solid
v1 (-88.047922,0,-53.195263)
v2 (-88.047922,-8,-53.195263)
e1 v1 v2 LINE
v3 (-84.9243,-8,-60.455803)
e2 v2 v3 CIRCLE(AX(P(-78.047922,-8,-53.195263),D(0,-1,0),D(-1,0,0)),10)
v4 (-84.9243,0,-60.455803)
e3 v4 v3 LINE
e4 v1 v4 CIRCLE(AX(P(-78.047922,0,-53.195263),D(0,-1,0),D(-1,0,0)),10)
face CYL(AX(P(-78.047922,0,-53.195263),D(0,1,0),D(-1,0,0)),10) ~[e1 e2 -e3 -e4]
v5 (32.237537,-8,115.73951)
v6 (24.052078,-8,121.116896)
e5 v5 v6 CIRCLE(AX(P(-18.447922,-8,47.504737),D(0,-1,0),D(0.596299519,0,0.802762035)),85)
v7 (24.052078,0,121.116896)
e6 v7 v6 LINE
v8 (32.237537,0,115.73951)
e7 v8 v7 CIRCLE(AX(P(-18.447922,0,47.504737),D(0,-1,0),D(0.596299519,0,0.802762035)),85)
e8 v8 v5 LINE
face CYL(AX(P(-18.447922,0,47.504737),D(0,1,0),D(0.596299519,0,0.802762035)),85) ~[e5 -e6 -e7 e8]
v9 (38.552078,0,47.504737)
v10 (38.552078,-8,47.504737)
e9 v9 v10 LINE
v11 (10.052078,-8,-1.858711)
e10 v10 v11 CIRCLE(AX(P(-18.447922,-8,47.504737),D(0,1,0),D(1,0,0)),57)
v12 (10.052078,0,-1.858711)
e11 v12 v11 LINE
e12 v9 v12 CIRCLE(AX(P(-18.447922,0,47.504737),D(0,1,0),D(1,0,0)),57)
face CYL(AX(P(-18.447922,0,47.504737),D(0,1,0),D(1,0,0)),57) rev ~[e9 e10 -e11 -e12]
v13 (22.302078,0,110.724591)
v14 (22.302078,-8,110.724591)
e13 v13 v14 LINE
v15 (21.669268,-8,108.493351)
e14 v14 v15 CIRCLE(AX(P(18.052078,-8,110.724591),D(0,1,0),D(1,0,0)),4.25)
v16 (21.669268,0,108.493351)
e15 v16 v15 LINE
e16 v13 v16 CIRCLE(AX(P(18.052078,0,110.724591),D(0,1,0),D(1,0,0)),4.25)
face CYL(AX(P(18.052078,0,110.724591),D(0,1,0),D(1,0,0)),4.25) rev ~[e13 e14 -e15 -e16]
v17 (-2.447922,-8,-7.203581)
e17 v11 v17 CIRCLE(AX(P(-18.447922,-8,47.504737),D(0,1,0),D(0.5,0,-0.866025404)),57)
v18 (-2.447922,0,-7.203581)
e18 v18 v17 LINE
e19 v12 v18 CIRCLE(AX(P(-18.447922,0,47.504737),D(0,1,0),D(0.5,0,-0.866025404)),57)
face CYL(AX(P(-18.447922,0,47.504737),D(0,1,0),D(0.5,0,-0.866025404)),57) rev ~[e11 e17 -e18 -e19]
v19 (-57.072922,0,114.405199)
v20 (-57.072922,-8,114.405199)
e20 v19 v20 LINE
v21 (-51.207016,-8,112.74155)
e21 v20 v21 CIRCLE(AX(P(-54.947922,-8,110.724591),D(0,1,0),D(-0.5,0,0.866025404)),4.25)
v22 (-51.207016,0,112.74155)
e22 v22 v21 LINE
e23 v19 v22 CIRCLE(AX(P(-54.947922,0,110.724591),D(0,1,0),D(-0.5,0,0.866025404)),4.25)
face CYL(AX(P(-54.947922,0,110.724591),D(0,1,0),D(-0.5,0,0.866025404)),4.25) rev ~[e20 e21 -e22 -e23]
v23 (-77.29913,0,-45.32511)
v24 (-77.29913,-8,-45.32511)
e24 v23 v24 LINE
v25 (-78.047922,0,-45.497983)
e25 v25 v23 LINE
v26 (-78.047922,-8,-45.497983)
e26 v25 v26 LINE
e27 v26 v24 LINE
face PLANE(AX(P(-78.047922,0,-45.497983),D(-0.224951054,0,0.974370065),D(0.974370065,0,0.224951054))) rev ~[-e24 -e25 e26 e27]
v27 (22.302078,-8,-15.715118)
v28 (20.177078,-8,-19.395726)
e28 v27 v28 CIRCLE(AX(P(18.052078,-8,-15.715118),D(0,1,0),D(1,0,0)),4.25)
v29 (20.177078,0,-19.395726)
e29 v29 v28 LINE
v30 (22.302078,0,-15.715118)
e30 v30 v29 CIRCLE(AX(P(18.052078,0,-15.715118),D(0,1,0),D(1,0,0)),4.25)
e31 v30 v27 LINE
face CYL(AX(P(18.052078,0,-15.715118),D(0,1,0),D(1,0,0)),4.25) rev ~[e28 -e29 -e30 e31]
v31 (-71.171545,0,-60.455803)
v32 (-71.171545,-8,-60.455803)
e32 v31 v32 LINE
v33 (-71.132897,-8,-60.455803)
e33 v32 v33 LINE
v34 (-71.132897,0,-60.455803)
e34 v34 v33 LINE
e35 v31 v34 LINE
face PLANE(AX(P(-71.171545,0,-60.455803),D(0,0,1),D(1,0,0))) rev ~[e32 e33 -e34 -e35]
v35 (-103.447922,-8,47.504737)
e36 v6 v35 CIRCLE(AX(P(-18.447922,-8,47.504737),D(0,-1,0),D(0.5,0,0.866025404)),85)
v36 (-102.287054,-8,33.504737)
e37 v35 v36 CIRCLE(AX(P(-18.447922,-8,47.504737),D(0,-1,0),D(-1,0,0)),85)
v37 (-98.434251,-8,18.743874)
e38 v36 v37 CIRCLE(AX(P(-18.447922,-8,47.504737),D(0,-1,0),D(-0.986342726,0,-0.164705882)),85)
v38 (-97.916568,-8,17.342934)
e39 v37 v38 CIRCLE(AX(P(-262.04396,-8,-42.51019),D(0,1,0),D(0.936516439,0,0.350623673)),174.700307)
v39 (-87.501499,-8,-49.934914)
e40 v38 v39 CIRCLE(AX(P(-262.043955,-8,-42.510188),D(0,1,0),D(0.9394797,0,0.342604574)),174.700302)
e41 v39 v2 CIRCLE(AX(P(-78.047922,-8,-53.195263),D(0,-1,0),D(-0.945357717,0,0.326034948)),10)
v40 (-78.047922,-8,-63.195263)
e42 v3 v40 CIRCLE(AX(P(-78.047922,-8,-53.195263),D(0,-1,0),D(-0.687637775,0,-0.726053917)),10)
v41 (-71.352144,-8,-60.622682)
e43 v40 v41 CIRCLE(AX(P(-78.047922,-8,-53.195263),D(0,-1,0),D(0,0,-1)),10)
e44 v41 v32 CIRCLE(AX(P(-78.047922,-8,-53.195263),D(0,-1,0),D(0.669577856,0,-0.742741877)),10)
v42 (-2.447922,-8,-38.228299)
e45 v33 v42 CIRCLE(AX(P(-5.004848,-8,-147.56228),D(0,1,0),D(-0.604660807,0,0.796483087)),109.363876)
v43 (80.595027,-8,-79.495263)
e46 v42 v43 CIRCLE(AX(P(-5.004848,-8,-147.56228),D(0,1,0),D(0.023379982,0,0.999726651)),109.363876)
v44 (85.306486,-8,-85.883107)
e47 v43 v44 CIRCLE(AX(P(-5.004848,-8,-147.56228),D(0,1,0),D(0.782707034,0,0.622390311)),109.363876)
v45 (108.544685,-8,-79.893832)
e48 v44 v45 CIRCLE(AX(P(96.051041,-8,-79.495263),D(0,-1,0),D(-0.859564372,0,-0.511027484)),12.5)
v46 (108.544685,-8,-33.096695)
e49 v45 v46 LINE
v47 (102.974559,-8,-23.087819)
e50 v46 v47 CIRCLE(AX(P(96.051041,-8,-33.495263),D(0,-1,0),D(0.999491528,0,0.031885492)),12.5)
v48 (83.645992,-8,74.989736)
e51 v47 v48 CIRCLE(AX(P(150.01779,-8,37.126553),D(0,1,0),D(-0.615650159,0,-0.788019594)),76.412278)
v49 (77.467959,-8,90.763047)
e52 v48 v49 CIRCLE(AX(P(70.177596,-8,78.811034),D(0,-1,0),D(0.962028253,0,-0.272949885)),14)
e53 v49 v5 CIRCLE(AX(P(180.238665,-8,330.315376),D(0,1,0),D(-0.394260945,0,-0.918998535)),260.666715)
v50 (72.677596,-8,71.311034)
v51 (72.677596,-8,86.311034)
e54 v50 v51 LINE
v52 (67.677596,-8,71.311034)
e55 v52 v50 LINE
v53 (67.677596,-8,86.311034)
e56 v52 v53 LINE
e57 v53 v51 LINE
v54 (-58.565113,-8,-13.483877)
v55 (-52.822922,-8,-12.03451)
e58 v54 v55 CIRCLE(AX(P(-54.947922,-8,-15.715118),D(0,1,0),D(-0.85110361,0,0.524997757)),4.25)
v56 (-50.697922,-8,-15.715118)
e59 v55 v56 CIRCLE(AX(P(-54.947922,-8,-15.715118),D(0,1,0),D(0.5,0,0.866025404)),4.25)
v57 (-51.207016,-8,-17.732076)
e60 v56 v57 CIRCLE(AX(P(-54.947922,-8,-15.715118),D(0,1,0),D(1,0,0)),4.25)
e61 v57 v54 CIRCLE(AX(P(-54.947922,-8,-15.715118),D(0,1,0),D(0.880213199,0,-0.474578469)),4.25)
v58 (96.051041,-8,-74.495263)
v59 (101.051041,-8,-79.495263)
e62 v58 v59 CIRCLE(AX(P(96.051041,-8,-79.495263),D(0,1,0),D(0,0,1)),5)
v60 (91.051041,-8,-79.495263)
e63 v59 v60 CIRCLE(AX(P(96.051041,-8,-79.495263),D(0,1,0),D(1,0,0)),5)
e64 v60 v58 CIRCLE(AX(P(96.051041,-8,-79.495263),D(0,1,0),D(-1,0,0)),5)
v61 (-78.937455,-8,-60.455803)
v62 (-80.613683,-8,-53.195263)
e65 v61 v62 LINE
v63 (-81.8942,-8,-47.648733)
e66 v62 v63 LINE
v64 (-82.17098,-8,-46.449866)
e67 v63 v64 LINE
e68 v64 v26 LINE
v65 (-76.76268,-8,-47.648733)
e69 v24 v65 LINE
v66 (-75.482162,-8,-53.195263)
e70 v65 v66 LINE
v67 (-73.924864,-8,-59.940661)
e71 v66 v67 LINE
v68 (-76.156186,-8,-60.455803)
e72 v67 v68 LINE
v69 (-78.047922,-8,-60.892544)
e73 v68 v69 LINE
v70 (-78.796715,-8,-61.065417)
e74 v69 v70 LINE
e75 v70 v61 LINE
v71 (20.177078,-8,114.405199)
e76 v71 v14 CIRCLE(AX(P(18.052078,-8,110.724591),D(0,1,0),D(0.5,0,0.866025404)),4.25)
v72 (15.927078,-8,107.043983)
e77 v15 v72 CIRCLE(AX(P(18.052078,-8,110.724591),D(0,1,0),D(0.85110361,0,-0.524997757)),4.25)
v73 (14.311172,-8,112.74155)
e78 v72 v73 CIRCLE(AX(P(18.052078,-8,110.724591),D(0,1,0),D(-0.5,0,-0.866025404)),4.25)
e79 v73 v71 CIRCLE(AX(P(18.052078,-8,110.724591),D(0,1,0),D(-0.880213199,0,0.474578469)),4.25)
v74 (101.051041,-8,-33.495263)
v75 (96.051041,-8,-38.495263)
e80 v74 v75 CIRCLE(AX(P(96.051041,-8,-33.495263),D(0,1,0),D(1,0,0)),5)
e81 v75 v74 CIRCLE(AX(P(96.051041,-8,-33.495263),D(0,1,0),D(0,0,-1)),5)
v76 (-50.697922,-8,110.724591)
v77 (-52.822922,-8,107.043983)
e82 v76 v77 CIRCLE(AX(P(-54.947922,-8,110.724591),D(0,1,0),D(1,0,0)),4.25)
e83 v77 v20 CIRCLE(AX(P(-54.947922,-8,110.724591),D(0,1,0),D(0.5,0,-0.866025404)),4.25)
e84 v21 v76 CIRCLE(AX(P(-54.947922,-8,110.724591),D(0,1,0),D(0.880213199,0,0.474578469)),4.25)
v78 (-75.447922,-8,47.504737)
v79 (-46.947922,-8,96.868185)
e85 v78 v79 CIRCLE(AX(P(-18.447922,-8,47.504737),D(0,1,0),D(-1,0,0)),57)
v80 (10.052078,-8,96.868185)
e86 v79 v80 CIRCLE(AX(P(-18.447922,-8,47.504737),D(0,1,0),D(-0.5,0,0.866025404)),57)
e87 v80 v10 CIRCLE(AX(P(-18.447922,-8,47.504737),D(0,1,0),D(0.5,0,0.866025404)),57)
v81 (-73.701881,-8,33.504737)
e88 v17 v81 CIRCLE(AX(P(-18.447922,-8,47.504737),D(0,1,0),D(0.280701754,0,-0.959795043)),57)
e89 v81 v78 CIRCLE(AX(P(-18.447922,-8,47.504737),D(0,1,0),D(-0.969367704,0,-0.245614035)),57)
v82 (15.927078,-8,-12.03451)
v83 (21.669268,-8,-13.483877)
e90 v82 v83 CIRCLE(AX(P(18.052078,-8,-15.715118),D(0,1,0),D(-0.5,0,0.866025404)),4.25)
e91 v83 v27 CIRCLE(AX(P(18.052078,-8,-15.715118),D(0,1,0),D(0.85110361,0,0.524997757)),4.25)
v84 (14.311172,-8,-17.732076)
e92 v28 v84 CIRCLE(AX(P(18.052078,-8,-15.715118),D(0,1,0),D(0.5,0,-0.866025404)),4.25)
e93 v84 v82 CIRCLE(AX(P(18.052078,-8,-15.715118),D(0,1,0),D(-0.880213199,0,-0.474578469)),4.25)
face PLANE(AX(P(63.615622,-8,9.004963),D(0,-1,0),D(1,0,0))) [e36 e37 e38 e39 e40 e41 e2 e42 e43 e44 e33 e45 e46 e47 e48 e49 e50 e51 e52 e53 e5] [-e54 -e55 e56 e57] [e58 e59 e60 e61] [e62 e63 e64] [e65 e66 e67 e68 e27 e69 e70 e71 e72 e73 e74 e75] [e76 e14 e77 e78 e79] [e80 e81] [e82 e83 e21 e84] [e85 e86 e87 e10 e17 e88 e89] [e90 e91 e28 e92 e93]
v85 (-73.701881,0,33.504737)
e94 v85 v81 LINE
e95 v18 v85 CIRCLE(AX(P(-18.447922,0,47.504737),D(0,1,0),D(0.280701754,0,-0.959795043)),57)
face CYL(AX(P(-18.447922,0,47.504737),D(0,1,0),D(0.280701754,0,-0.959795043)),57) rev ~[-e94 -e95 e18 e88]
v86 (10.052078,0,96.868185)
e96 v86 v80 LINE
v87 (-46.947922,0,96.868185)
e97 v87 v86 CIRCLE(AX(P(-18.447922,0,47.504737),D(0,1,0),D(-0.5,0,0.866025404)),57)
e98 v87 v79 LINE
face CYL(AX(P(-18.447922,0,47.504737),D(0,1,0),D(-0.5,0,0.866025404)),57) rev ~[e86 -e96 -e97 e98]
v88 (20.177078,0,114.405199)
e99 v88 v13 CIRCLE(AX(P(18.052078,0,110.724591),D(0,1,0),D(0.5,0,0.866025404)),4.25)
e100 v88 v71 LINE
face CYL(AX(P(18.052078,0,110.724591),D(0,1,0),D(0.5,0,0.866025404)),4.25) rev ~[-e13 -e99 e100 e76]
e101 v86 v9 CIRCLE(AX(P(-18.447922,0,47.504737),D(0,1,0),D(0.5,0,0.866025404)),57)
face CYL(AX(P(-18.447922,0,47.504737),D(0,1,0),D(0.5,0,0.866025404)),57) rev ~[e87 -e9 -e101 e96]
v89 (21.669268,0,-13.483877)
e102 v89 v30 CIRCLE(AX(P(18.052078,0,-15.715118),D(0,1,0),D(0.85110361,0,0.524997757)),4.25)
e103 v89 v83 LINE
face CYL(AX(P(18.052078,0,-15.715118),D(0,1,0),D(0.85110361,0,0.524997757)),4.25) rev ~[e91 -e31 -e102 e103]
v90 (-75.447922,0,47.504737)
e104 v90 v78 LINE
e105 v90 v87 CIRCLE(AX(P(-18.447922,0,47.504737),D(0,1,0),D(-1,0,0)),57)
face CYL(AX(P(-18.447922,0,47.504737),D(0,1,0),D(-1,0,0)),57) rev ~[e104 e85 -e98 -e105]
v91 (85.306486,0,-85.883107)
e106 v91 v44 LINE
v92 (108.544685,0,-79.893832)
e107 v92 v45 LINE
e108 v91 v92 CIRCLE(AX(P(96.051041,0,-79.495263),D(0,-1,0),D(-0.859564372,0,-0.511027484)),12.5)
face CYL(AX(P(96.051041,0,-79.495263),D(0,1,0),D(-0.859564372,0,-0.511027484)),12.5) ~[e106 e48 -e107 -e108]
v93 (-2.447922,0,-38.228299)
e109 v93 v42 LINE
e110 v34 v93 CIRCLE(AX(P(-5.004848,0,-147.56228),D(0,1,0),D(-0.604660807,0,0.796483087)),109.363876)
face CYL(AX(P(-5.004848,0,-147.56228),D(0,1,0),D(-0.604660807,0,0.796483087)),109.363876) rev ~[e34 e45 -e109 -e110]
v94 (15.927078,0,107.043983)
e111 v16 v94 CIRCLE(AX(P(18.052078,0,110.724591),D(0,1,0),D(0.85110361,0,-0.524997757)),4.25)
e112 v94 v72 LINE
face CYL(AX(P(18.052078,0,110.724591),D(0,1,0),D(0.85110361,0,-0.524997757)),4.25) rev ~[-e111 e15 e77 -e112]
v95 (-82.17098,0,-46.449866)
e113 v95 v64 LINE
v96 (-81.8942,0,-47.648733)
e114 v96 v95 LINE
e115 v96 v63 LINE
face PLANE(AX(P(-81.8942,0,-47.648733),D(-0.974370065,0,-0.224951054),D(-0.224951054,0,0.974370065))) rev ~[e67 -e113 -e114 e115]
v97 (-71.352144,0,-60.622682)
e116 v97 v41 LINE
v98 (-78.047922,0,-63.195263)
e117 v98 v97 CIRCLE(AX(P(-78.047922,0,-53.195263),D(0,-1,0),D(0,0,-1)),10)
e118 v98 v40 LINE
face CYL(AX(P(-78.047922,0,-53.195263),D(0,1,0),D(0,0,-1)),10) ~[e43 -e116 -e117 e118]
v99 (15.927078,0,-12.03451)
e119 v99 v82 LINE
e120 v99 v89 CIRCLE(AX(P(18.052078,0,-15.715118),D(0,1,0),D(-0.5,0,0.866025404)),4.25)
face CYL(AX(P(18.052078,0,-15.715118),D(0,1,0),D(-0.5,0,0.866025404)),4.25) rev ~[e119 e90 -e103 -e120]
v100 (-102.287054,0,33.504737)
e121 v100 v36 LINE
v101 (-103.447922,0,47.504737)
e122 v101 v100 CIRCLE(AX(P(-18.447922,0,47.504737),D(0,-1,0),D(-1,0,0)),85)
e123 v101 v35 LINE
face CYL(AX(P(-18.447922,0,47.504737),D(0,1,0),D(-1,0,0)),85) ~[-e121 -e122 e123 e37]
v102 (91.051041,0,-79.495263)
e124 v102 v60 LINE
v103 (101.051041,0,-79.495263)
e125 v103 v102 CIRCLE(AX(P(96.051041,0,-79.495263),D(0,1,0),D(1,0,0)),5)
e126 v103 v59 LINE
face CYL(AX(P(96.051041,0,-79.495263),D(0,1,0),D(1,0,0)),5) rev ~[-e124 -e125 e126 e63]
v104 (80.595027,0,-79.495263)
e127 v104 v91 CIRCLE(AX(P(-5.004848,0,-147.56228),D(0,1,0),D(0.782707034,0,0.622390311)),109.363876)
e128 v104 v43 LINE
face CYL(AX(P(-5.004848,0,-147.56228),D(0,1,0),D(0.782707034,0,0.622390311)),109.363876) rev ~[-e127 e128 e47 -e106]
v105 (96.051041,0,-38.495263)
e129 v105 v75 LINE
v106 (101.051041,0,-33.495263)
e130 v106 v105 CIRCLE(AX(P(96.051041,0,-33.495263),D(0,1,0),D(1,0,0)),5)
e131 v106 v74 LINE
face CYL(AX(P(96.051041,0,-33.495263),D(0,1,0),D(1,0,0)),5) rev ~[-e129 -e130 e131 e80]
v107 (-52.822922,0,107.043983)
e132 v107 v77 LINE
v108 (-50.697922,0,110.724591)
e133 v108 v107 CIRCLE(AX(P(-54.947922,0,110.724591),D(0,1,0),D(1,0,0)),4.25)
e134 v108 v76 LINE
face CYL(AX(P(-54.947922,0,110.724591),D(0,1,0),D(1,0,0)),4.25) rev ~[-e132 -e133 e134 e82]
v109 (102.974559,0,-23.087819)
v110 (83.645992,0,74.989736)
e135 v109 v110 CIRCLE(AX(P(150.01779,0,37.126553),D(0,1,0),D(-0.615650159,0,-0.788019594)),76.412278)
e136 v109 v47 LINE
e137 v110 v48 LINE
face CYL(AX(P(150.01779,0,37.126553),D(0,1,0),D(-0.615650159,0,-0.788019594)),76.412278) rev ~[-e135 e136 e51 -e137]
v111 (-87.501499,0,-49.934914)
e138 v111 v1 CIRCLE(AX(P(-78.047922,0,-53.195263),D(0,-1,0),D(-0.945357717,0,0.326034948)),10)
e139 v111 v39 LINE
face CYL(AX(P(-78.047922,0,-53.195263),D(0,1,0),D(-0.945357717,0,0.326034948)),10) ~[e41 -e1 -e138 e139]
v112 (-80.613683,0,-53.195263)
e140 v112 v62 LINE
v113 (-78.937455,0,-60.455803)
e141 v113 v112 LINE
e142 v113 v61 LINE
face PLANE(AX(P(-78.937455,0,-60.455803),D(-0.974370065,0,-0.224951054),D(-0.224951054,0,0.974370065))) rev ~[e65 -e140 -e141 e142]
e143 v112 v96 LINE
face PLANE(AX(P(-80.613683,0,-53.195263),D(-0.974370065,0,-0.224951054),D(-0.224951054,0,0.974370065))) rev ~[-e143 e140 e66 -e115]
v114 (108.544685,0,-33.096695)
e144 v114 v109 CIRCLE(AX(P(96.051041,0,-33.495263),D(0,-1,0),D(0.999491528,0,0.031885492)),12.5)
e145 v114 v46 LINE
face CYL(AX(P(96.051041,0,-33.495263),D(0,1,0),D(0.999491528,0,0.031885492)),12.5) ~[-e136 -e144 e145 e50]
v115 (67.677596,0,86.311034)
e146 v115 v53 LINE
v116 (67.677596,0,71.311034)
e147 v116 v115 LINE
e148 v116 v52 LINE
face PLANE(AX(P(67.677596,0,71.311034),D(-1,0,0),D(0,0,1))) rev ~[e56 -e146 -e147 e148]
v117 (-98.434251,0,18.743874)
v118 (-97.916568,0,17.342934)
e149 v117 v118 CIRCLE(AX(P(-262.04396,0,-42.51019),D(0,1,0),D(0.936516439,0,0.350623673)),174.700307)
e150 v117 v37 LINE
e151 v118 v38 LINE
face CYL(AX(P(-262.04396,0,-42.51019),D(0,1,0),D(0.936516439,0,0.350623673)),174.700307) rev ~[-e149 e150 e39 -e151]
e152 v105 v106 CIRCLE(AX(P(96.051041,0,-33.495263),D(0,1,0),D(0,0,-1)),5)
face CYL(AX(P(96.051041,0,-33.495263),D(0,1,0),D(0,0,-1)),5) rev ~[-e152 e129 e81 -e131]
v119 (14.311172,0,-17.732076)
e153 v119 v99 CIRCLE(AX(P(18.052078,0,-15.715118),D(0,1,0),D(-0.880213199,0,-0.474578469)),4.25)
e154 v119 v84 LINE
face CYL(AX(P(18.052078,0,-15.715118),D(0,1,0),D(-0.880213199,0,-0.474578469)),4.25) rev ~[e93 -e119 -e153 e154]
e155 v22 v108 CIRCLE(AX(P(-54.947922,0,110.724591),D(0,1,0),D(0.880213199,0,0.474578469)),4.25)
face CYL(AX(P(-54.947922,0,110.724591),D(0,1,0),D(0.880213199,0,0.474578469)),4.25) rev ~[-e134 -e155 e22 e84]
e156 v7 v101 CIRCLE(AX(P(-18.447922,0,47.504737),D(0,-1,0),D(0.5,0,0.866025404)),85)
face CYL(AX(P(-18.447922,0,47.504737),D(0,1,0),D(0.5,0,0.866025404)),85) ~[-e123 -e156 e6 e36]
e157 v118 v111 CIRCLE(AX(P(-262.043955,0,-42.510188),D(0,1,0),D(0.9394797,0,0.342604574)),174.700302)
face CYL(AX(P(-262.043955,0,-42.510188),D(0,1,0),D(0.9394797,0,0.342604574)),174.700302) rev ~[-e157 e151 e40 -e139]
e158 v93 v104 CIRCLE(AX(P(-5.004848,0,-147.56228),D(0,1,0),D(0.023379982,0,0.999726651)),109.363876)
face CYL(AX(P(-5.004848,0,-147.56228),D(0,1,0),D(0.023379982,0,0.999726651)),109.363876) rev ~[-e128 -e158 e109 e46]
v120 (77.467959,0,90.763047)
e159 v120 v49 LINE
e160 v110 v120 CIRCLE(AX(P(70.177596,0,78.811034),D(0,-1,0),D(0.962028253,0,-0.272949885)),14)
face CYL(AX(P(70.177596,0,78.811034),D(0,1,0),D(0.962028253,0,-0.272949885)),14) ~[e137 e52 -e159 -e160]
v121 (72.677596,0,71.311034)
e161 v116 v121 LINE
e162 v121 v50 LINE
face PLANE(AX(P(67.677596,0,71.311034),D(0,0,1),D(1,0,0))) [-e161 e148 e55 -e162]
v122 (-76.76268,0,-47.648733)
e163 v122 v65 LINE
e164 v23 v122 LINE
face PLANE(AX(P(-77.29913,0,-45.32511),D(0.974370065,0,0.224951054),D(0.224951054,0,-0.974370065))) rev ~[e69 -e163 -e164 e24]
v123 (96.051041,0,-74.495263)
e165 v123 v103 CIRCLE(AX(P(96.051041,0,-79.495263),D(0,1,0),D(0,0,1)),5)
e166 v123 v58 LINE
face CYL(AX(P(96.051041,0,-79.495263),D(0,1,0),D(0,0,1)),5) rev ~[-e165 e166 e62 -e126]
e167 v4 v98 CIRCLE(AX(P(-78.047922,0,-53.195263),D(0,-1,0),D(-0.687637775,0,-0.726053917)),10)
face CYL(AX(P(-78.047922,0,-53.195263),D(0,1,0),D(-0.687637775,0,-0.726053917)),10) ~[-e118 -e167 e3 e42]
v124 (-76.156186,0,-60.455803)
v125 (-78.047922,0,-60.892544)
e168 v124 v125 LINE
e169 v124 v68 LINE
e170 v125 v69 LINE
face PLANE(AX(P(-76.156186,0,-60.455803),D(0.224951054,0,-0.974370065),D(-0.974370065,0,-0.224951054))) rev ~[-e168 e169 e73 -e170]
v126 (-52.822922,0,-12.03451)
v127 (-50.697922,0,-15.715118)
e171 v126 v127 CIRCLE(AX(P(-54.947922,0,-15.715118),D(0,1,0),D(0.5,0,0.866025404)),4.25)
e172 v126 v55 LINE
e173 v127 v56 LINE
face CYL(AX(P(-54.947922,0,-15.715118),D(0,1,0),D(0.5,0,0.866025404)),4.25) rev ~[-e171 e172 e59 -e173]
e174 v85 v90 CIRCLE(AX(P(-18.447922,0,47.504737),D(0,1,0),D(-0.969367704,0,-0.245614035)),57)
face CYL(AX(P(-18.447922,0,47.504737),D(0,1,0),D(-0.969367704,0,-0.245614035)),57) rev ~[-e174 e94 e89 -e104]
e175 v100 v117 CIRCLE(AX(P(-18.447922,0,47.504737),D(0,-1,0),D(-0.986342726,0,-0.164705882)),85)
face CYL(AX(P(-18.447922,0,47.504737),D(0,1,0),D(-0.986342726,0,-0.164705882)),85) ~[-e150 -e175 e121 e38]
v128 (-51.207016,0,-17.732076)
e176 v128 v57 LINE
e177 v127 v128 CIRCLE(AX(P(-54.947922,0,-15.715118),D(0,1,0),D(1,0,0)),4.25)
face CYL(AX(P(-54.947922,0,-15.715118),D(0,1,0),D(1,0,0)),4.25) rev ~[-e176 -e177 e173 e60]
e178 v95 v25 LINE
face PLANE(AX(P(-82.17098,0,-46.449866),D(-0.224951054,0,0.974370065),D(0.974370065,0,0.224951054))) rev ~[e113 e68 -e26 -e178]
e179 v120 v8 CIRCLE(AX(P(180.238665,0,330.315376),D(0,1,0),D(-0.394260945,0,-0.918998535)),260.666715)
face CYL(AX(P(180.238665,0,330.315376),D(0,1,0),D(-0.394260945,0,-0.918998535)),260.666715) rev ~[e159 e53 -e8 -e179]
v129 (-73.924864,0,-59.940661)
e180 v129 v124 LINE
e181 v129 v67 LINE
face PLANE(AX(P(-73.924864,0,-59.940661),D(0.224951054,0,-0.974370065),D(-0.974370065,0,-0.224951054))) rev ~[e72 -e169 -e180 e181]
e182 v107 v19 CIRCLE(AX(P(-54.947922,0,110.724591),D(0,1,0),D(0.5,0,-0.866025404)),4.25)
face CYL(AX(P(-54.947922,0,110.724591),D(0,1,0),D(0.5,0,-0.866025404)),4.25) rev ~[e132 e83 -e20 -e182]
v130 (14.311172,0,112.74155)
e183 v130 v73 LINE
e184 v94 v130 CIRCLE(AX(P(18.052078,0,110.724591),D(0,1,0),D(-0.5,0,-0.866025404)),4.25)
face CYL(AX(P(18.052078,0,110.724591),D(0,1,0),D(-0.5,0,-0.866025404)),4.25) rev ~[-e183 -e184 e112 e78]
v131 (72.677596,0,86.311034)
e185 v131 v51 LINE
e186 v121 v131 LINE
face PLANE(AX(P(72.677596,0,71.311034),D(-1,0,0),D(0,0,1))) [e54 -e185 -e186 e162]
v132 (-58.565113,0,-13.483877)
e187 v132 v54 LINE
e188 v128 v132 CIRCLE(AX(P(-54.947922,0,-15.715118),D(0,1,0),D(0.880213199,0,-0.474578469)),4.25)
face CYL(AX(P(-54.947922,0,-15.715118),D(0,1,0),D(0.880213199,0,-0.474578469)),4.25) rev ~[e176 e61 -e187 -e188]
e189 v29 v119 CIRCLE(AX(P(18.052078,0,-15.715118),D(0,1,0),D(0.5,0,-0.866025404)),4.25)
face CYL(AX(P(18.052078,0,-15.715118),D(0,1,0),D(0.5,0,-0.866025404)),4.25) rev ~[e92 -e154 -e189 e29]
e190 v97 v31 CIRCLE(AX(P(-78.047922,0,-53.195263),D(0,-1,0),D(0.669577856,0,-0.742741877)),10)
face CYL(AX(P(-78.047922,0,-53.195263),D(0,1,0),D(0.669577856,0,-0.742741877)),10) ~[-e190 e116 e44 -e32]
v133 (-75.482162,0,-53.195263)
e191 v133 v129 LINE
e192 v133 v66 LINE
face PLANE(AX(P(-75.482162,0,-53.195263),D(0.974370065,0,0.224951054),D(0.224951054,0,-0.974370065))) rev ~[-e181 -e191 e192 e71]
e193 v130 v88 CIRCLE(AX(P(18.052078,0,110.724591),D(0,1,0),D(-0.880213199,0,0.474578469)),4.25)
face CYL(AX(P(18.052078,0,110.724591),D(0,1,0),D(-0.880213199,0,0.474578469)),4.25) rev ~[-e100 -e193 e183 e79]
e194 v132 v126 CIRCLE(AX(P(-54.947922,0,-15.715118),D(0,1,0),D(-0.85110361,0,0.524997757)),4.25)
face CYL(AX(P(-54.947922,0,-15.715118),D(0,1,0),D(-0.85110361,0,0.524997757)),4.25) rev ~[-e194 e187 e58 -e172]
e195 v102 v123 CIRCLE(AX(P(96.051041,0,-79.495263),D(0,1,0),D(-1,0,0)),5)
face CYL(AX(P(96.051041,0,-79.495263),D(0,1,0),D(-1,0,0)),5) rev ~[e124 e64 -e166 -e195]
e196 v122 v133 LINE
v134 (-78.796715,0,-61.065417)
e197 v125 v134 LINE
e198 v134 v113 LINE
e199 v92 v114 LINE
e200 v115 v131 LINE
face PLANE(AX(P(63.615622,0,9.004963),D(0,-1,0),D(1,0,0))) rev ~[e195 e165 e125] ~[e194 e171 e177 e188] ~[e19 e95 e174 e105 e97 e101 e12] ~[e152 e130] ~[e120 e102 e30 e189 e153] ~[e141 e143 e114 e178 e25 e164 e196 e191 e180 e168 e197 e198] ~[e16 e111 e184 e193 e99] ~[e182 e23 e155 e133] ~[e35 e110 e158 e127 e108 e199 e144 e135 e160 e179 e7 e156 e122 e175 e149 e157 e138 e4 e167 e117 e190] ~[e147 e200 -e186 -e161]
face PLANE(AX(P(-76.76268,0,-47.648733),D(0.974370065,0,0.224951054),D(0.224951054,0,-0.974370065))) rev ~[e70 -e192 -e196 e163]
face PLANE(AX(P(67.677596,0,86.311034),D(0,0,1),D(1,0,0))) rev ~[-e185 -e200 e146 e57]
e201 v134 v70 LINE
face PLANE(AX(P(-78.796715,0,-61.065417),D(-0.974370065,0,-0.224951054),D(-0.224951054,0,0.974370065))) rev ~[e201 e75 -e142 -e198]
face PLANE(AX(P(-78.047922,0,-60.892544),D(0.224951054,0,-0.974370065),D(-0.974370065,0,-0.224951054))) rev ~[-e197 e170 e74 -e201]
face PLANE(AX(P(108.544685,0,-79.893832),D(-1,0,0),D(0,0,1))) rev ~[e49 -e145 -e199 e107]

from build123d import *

# Parameters (mm, degrees)
F0_W     = 5
F0_H     = 15
F1_DEPTH = 8


with BuildPart() as f1:
    # F0 (on Front) → F1 (new body)
    with BuildSketch(Plane.XZ):
        with BuildLine():
            ThreePointArc((96.051040545, -74.4952633909), (99.586574451, -75.9597294849), (101.051040545, -79.4952633909))
            Line((101.051040545, -79.4952633909), (108.5446846503, -79.4952633909))
            Line((108.5446846503, -79.4952633909), (108.5446846503, -79.0966947381))
            Line((108.5446846503, -79.0966947381), (108.5446846503, -33.8938320436))
            Line((108.5446846503, -33.8938320436), (108.5446846503, -33.0966947381))
            ThreePointArc((108.5446846503, -33.0966947381), (106.9735378091, -27.4166900782), (102.9745588744, -23.0878192309))
            ThreePointArc((102.9745588744, -23.0878192309), (75.0475031004, 22.3518348869), (83.6459918624, 74.9897356957))
            ThreePointArc((83.6459918624, 74.9897356957), (83.213349074, 83.916829816), (77.4679593625, 90.763046748))
            ThreePointArc((77.4679593625, 90.763046748), (54.2323791008, 102.1278384031), (32.237536797, 115.739509553))
            ThreePointArc((32.237536797, 115.739509553), (46.3985337021, 102.4586914011), (57.1766192186, 86.3110340872))
            ThreePointArc((57.1766192186, 86.3110340872), (64.1749741493, 67.4661239993), (66.5520777255, 47.5047366091))
            ThreePointArc((66.5520777255, 47.5047366091), (55.1642370471, 5.0047366091), (24.0520777255, -26.1074227125))
            ThreePointArc((24.0520777255, -26.1074227125), (11.2153330726, -32.151344654), (-2.4479222745, -35.9758000446))
            Line((-2.4479222745, -35.9758000446), (-2.4479222745, -38.2282986652))
            ThreePointArc((-2.4479222745, -38.2282986652), (43.6638893075, -49.6244865639), (80.5950273587, -79.4952633909))
            Line((80.5950273587, -79.4952633909), (91.051040545, -79.4952633909))
            ThreePointArc((91.051040545, -79.4952633909), (92.5155066391, -75.9597294849), (96.051040545, -74.4952633909))
        make_face()
        with BuildLine():
            ThreePointArc((101.051040545, -33.4952633909), (99.586574451, -37.0307972968), (96.051040545, -38.4952633909))
            ThreePointArc((96.051040545, -38.4952633909), (92.5155066391, -29.9597294849), (101.051040545, -33.4952633909))
        make_face(mode=Mode.SUBTRACT)
        with Locations((70.1775963157, 78.8110340872)):
            Rectangle(F0_W, F0_H, mode=Mode.SUBTRACT)
        with BuildLine():
            Line((108.5446846503, -79.4952633909), (101.051040545, -79.4952633909))
            ThreePointArc((101.051040545, -79.4952633909), (96.051040545, -84.4952633909), (91.051040545, -79.4952633909))
            Line((91.051040545, -79.4952633909), (80.5950273587, -79.4952633909))
            ThreePointArc((80.5950273587, -79.4952633909), (83.0087277773, -82.6464275943), (85.3064858893, -85.8831069432))
            ThreePointArc((85.3064858893, -85.8831069432), (99.1707652013, -91.5996972095), (108.5446846503, -79.8938320436))
            Line((108.5446846503, -79.8938320436), (108.5446846503, -79.4952633909))
        make_face()
        with BuildLine():
            ThreePointArc((-49.4766412308, -47.648732709), (-26.485075504, -40.328623161), (-2.4479222745, -38.2282986652))
            Line((-2.4479222745, -38.2282986652), (-2.4479222745, -35.9758000446))
            ThreePointArc((-2.4479222745, -35.9758000446), (-59.8941418394, -26.7058481061), (-97.9165682257, 17.3429344301))
            ThreePointArc((-97.9165682257, 17.3429344301), (-89.4001229489, -15.7837478144), (-87.5014994409, -49.9349139067))
            ThreePointArc((-87.5014994409, -49.9349139067), (-87.0083312551, -48.7555482085), (-86.3687393855, -47.648732709))
            ThreePointArc((-86.3687393855, -47.648732709), (-82.7667512172, -44.3786510364), (-78.0479222745, -43.1952633909))
            Line((-78.0479222745, -43.1952633909), (-78.0479222745, -42.0817346844))
            Line((-78.0479222745, -42.0817346844), (-77.7900763305, -43.1985881701))
            ThreePointArc((-77.7900763305, -43.1985881701), (-73.2158097389, -44.4402255016), (-69.7271051635, -47.648732709))
            Line((-69.7271051635, -47.648732709), (-49.4766412308, -47.648732709))
        make_face()
        with BuildLine():
            ThreePointArc((-97.9165682257, 17.3429344301), (-59.8941418394, -26.7058481061), (-2.4479222745, -35.9758000446))
            Line((-2.4479222745, -35.9758000446), (-2.4479222745, -23.7202590034))
            ThreePointArc((-2.4479222745, -23.7202590034), (-27.346314823, -24.9508954014), (-51.2070161773, -17.7320763623))
            ThreePointArc((-51.2070161773, -17.7320763623), (-57.0729222745, -19.3957258332), (-58.5651126184, -13.4838774013))
            ThreePointArc((-58.5651126184, -13.4838774013), (-79.0670356762, 6.8313658317), (-90.0928802269, 33.5047366091))
            Line((-90.0928802269, 33.5047366091), (-102.2870539494, 33.5047366091))
            ThreePointArc((-102.2870539494, 33.5047366091), (-100.6924729992, 26.0376949849), (-98.4342508199, 18.7438735165))
            ThreePointArc((-98.4342508199, 18.7438735165), (-98.1739124224, 18.0439571899), (-97.9165682257, 17.3429344301))
        make_face()
        with BuildLine():
            Line((-2.4479222745, -23.7202590034), (-2.4479222745, -35.9758000446))
            ThreePointArc((-2.4479222745, -35.9758000446), (11.2153330726, -32.151344654), (24.0520777255, -26.1074227125))
            Line((24.0520777255, -26.1074227125), (20.1770777255, -19.3957258332))
            ThreePointArc((20.1770777255, -19.3957258332), (16.8924568739, -19.8038559953), (14.3111716282, -17.7320763623))
            ThreePointArc((14.3111716282, -17.7320763623), (6.1147911828, -21.2387947783), (-2.4479222745, -23.7202590034))
        make_face()
        with BuildLine():
            ThreePointArc((-71.1328973462, -60.4558025605), (-60.6742880355, -53.4274258311), (-49.4766412308, -47.648732709))
            Line((-49.4766412308, -47.648732709), (-69.7271051635, -47.648732709))
            ThreePointArc((-69.7271051635, -47.648732709), (-68.4769199469, -50.2976929525), (-68.0479222745, -53.1952633909))
            ThreePointArc((-68.0479222745, -53.1952633909), (-68.8619607706, -57.1472390041), (-71.1715445241, -60.4558025605))
            Line((-71.1715445241, -60.4558025605), (-71.1328973462, -60.4558025605))
        make_face()
        with BuildLine():
            ThreePointArc((-51.2070161773, -17.7320763623), (-27.346314823, -24.9508954014), (-2.4479222745, -23.7202590034))
            Line((-2.4479222745, -23.7202590034), (-2.4479222745, -7.2035808572))
            ThreePointArc((-2.4479222745, -7.2035808572), (-25.2453046649, -9.0885102728), (-46.9479222745, -1.8587114066))
            Line((-46.9479222745, -1.8587114066), (-52.8229222745, -12.034509901))
            ThreePointArc((-52.8229222745, -12.034509901), (-51.2673143085, -13.5901178671), (-50.6979222745, -15.7151178671))
            ThreePointArc((-50.6979222745, -15.7151178671), (-50.8271607604, -16.755225815), (-51.2070161773, -17.7320763623))
        make_face()
        with BuildLine():
            Line((-2.4479222745, -7.2035808572), (-2.4479222745, -23.7202590034))
            ThreePointArc((-2.4479222745, -23.7202590034), (6.1147911828, -21.2387947783), (14.3111716282, -17.7320763623))
            ThreePointArc((14.3111716282, -17.7320763623), (13.9633395973, -14.5554970156), (15.9270777255, -12.034509901))
            Line((15.9270777255, -12.034509901), (10.0520777255, -1.8587114066))
            ThreePointArc((10.0520777255, -1.8587114066), (3.9619953371, -4.9051440684), (-2.4479222745, -7.2035808572))
        make_face()
        with BuildLine():
            Line((20.1770777255, -19.3957258332), (24.0520777255, -26.1074227125))
            ThreePointArc((24.0520777255, -26.1074227125), (55.1642370471, 5.0047366091), (66.5520777255, 47.5047366091))
            ThreePointArc((66.5520777255, 47.5047366091), (64.1749741493, 67.4661239993), (57.1766192186, 86.3110340872))
            ThreePointArc((57.1766192186, 86.3110340872), (46.3985337021, 102.4586914011), (32.237536797, 115.739509553))
            ThreePointArc((32.237536797, 115.739509553), (28.2223200289, 118.5461926988), (24.0520777255, 121.1168959308))
            Line((24.0520777255, 121.1168959308), (20.1770777255, 114.4051990515))
            ThreePointArc((20.1770777255, 114.4051990515), (21.7326856915, 112.8495910854), (22.3020777255, 110.7245910854))
            ThreePointArc((22.3020777255, 110.7245910854), (22.1408158536, 109.5649702339), (21.6692680693, 108.4933506196))
            ThreePointArc((21.6692680693, 108.4933506196), (45.8076412788, 82.1489648795), (54.5520777255, 47.5047366091))
            ThreePointArc((54.5520777255, 47.5047366091), (45.8076412788, 12.8605083388), (21.6692680693, -13.4838774013))
            ThreePointArc((21.6692680693, -13.4838774013), (22.1408158536, -14.5554970156), (22.3020777255, -15.7151178671))
            ThreePointArc((22.3020777255, -15.7151178671), (21.7326856915, -17.8401178671), (20.1770777255, -19.3957258332))
        make_face()
        with BuildLine():
            ThreePointArc((-68.0479222745, -53.1952633909), (-68.4769199469, -50.2976929525), (-69.7271051635, -47.648732709))
            Line((-69.7271051635, -47.648732709), (-76.7626795106, -47.648732709))
            Line((-76.7626795106, -47.648732709), (-75.4821620051, -53.1952633909))
            Line((-75.4821620051, -53.1952633909), (-73.924864205, -59.9406612409))
            Line((-73.924864205, -59.9406612409), (-73.8059344604, -60.4558025605))
            Line((-73.8059344604, -60.4558025605), (-71.1715445241, -60.4558025605))
            ThreePointArc((-71.1715445241, -60.4558025605), (-68.8619607706, -57.1472390041), (-68.0479222745, -53.1952633909))
        make_face()
        with BuildLine():
            Line((-76.7626795106, -47.648732709), (-69.7271051635, -47.648732709))
            ThreePointArc((-69.7271051635, -47.648732709), (-73.2158097389, -44.4402255016), (-77.7900763305, -43.1985881701))
            Line((-77.7900763305, -43.1985881701), (-77.2991300202, -45.3251102691))
            Line((-77.2991300202, -45.3251102691), (-76.7626795106, -47.648732709))
        make_face()
        with BuildLine():
            ThreePointArc((-86.3687393855, -47.648732709), (-87.0083312551, -48.7555482085), (-87.5014994409, -49.9349139067))
            ThreePointArc((-87.5014994409, -49.9349139067), (-87.9103705422, -51.5423525741), (-88.0479222745, -53.1952633909))
            Line((-88.0479222745, -53.1952633909), (-80.613682544, -53.1952633909))
            Line((-80.613682544, -53.1952633909), (-81.8942000496, -47.648732709))
            Line((-81.8942000496, -47.648732709), (-86.3687393855, -47.648732709))
        make_face()
        with BuildLine():
            ThreePointArc((-71.3521437188, -60.6226821573), (-71.2613311641, -60.5397974877), (-71.1715445241, -60.4558025605))
            Line((-71.1715445241, -60.4558025605), (-73.8059344604, -60.4558025605))
            Line((-73.8059344604, -60.4558025605), (-76.1561864026, -60.4558025605))
            Line((-76.1561864026, -60.4558025605), (-78.0479222745, -60.8925441993))
            Line((-78.0479222745, -60.8925441993), (-78.0479222745, -63.1952633909))
            ThreePointArc((-78.0479222745, -63.1952633909), (-74.4614328813, -62.5299885519), (-71.3521437188, -60.6226821573))
        make_face()
        with BuildLine():
            ThreePointArc((-78.0479222745, -43.1952633909), (-77.9189885852, -43.1960946202), (-77.7900763305, -43.1985881701))
            Line((-77.7900763305, -43.1985881701), (-78.0479222745, -42.0817346844))
            Line((-78.0479222745, -42.0817346844), (-78.0479222745, -43.1952633909))
        make_face()
        with BuildLine():
            Line((-77.2991300202, -45.3251102691), (-77.7900763305, -43.1985881701))
            ThreePointArc((-77.7900763305, -43.1985881701), (-77.9189885852, -43.1960946202), (-78.0479222745, -43.1952633909))
            Line((-78.0479222745, -43.1952633909), (-78.0479222745, -45.4979825824))
            Line((-78.0479222745, -45.4979825824), (-77.2991300202, -45.3251102691))
        make_face()
        with BuildLine():
            Line((-52.8229222745, -12.034509901), (-46.9479222745, -1.8587114066))
            ThreePointArc((-46.9479222745, -1.8587114066), (-63.9047675407, 13.1146912697), (-73.7018814087, 33.5047366091))
            Line((-73.7018814087, 33.5047366091), (-90.0928802269, 33.5047366091))
            ThreePointArc((-90.0928802269, 33.5047366091), (-79.0670356762, 6.8313658317), (-58.5651126184, -13.4838774013))
            ThreePointArc((-58.5651126184, -13.4838774013), (-55.9880302224, -11.5943563529), (-52.8229222745, -12.034509901))
        make_face()
        with BuildLine():
            ThreePointArc((38.5520777255, 47.5047366091), (30.9155257412, 19.0047366091), (10.0520777255, -1.8587114066))
            Line((10.0520777255, -1.8587114066), (15.9270777255, -12.034509901))
            ThreePointArc((15.9270777255, -12.034509901), (19.0921856734, -11.5943563529), (21.6692680693, -13.4838774013))
            ThreePointArc((21.6692680693, -13.4838774013), (45.8076412788, 12.8605083388), (54.5520777255, 47.5047366091))
            ThreePointArc((54.5520777255, 47.5047366091), (45.8076412788, 82.1489648795), (21.6692680693, 108.4933506196))
            ThreePointArc((21.6692680693, 108.4933506196), (19.0921856734, 106.6038295712), (15.9270777255, 107.0439831193))
            Line((15.9270777255, 107.0439831193), (10.0520777255, 96.8681846249))
            ThreePointArc((10.0520777255, 96.8681846249), (30.9155257412, 76.0047366091), (38.5520777255, 47.5047366091))
        make_face()
        with BuildLine():
            ThreePointArc((-103.4479222745, 47.5047366091), (-103.1572080476, 40.4807132737), (-102.2870539494, 33.5047366091))
            Line((-102.2870539494, 33.5047366091), (-90.0928802269, 33.5047366091))
            ThreePointArc((-90.0928802269, 33.5047366091), (-91.1083720754, 40.4720248464), (-91.4479222745, 47.5047366091))
            Line((-91.4479222745, 47.5047366091), (-103.4479222745, 47.5047366091))
        make_face()
        with BuildLine():
            ThreePointArc((-78.0479222745, -43.1952633909), (-82.7667512172, -44.3786510364), (-86.3687393855, -47.648732709))
            Line((-86.3687393855, -47.648732709), (-81.8942000496, -47.648732709))
            Line((-81.8942000496, -47.648732709), (-82.1709803441, -46.4498655408))
            Line((-82.1709803441, -46.4498655408), (-78.0479222745, -45.4979825824))
            Line((-78.0479222745, -45.4979825824), (-78.0479222745, -43.1952633909))
        make_face()
        with BuildLine():
            Line((-80.613682544, -53.1952633909), (-88.0479222745, -53.1952633909))
            ThreePointArc((-88.0479222745, -53.1952633909), (-87.2338837785, -57.1472390041), (-84.924300025, -60.4558025605))
            Line((-84.924300025, -60.4558025605), (-78.9374549993, -60.4558025605))
            Line((-78.9374549993, -60.4558025605), (-80.613682544, -53.1952633909))
        make_face()
        Polygon((-76.1561864026, -60.4558025605), (-73.8059344604, -60.4558025605), (-73.924864205, -59.9406612409), align=None)
        with BuildLine():
            ThreePointArc((-84.924300025, -60.4558025605), (-81.7489091905, -62.4851878172), (-78.0479222745, -63.1952633909))
            Line((-78.0479222745, -63.1952633909), (-78.0479222745, -60.8925441993))
            Line((-78.0479222745, -60.8925441993), (-78.7967145289, -61.0654165126))
            Line((-78.7967145289, -61.0654165126), (-78.9374549993, -60.4558025605))
            Line((-78.9374549993, -60.4558025605), (-84.924300025, -60.4558025605))
        make_face()
        with BuildLine():
            Line((-90.0928802269, 33.5047366091), (-73.7018814087, 33.5047366091))
            ThreePointArc((-73.7018814087, 33.5047366091), (-75.0097277206, 40.450506341), (-75.4479222745, 47.5047366091))
            Line((-75.4479222745, 47.5047366091), (-91.4479222745, 47.5047366091))
            ThreePointArc((-91.4479222745, 47.5047366091), (-91.1083720754, 40.4720248464), (-90.0928802269, 33.5047366091))
        make_face()
        with BuildLine():
            ThreePointArc((-60.9479222745, 121.1168959308), (-92.0600815962, 90.0047366091), (-103.4479222745, 47.5047366091))
            Line((-103.4479222745, 47.5047366091), (-91.4479222745, 47.5047366091))
            ThreePointArc((-91.4479222745, 47.5047366091), (-82.7034858278, 82.1489648795), (-58.5651126184, 108.4933506196))
            ThreePointArc((-58.5651126184, 108.4933506196), (-59.0686837887, 111.7646990333), (-57.0729222745, 114.4051990515))
            Line((-57.0729222745, 114.4051990515), (-60.9479222745, 121.1168959308))
        make_face()
        with BuildLine():
            Line((-91.4479222745, 47.5047366091), (-75.4479222745, 47.5047366091))
            ThreePointArc((-75.4479222745, 47.5047366091), (-67.8113702903, 76.0047366091), (-46.9479222745, 96.8681846249))
            Line((-46.9479222745, 96.8681846249), (-52.8229222745, 107.0439831193))
            ThreePointArc((-52.8229222745, 107.0439831193), (-55.9880302224, 106.6038295712), (-58.5651126184, 108.4933506196))
            ThreePointArc((-58.5651126184, 108.4933506196), (-82.7034858278, 82.1489648795), (-91.4479222745, 47.5047366091))
        make_face()
        with BuildLine():
            ThreePointArc((-46.9479222745, 96.8681846249), (-18.4479222745, 104.5047366091), (10.0520777255, 96.8681846249))
            Line((10.0520777255, 96.8681846249), (15.9270777255, 107.0439831193))
            ThreePointArc((15.9270777255, 107.0439831193), (13.9633395973, 109.5649702339), (14.3111716282, 112.7415495806))
            ThreePointArc((14.3111716282, 112.7415495806), (-18.4479222745, 120.5047366091), (-51.2070161773, 112.7415495806))
            ThreePointArc((-51.2070161773, 112.7415495806), (-50.8271607604, 111.7646990333), (-50.6979222745, 110.7245910854))
            ThreePointArc((-50.6979222745, 110.7245910854), (-51.2673143085, 108.5995910854), (-52.8229222745, 107.0439831193))
            Line((-52.8229222745, 107.0439831193), (-46.9479222745, 96.8681846249))
        make_face()
        with BuildLine():
            ThreePointArc((24.0520777255, 121.1168959308), (-18.4479222745, 132.5047366091), (-60.9479222745, 121.1168959308))
            Line((-60.9479222745, 121.1168959308), (-57.0729222745, 114.4051990515))
            ThreePointArc((-57.0729222745, 114.4051990515), (-53.788301423, 114.8133292136), (-51.2070161773, 112.7415495806))
            ThreePointArc((-51.2070161773, 112.7415495806), (-18.4479222745, 120.5047366091), (14.3111716282, 112.7415495806))
            ThreePointArc((14.3111716282, 112.7415495806), (16.8924568739, 114.8133292136), (20.1770777255, 114.4051990515))
            Line((20.1770777255, 114.4051990515), (24.0520777255, 121.1168959308))
        make_face()
    extrude(amount=F1_DEPTH)


solid = f1.part
